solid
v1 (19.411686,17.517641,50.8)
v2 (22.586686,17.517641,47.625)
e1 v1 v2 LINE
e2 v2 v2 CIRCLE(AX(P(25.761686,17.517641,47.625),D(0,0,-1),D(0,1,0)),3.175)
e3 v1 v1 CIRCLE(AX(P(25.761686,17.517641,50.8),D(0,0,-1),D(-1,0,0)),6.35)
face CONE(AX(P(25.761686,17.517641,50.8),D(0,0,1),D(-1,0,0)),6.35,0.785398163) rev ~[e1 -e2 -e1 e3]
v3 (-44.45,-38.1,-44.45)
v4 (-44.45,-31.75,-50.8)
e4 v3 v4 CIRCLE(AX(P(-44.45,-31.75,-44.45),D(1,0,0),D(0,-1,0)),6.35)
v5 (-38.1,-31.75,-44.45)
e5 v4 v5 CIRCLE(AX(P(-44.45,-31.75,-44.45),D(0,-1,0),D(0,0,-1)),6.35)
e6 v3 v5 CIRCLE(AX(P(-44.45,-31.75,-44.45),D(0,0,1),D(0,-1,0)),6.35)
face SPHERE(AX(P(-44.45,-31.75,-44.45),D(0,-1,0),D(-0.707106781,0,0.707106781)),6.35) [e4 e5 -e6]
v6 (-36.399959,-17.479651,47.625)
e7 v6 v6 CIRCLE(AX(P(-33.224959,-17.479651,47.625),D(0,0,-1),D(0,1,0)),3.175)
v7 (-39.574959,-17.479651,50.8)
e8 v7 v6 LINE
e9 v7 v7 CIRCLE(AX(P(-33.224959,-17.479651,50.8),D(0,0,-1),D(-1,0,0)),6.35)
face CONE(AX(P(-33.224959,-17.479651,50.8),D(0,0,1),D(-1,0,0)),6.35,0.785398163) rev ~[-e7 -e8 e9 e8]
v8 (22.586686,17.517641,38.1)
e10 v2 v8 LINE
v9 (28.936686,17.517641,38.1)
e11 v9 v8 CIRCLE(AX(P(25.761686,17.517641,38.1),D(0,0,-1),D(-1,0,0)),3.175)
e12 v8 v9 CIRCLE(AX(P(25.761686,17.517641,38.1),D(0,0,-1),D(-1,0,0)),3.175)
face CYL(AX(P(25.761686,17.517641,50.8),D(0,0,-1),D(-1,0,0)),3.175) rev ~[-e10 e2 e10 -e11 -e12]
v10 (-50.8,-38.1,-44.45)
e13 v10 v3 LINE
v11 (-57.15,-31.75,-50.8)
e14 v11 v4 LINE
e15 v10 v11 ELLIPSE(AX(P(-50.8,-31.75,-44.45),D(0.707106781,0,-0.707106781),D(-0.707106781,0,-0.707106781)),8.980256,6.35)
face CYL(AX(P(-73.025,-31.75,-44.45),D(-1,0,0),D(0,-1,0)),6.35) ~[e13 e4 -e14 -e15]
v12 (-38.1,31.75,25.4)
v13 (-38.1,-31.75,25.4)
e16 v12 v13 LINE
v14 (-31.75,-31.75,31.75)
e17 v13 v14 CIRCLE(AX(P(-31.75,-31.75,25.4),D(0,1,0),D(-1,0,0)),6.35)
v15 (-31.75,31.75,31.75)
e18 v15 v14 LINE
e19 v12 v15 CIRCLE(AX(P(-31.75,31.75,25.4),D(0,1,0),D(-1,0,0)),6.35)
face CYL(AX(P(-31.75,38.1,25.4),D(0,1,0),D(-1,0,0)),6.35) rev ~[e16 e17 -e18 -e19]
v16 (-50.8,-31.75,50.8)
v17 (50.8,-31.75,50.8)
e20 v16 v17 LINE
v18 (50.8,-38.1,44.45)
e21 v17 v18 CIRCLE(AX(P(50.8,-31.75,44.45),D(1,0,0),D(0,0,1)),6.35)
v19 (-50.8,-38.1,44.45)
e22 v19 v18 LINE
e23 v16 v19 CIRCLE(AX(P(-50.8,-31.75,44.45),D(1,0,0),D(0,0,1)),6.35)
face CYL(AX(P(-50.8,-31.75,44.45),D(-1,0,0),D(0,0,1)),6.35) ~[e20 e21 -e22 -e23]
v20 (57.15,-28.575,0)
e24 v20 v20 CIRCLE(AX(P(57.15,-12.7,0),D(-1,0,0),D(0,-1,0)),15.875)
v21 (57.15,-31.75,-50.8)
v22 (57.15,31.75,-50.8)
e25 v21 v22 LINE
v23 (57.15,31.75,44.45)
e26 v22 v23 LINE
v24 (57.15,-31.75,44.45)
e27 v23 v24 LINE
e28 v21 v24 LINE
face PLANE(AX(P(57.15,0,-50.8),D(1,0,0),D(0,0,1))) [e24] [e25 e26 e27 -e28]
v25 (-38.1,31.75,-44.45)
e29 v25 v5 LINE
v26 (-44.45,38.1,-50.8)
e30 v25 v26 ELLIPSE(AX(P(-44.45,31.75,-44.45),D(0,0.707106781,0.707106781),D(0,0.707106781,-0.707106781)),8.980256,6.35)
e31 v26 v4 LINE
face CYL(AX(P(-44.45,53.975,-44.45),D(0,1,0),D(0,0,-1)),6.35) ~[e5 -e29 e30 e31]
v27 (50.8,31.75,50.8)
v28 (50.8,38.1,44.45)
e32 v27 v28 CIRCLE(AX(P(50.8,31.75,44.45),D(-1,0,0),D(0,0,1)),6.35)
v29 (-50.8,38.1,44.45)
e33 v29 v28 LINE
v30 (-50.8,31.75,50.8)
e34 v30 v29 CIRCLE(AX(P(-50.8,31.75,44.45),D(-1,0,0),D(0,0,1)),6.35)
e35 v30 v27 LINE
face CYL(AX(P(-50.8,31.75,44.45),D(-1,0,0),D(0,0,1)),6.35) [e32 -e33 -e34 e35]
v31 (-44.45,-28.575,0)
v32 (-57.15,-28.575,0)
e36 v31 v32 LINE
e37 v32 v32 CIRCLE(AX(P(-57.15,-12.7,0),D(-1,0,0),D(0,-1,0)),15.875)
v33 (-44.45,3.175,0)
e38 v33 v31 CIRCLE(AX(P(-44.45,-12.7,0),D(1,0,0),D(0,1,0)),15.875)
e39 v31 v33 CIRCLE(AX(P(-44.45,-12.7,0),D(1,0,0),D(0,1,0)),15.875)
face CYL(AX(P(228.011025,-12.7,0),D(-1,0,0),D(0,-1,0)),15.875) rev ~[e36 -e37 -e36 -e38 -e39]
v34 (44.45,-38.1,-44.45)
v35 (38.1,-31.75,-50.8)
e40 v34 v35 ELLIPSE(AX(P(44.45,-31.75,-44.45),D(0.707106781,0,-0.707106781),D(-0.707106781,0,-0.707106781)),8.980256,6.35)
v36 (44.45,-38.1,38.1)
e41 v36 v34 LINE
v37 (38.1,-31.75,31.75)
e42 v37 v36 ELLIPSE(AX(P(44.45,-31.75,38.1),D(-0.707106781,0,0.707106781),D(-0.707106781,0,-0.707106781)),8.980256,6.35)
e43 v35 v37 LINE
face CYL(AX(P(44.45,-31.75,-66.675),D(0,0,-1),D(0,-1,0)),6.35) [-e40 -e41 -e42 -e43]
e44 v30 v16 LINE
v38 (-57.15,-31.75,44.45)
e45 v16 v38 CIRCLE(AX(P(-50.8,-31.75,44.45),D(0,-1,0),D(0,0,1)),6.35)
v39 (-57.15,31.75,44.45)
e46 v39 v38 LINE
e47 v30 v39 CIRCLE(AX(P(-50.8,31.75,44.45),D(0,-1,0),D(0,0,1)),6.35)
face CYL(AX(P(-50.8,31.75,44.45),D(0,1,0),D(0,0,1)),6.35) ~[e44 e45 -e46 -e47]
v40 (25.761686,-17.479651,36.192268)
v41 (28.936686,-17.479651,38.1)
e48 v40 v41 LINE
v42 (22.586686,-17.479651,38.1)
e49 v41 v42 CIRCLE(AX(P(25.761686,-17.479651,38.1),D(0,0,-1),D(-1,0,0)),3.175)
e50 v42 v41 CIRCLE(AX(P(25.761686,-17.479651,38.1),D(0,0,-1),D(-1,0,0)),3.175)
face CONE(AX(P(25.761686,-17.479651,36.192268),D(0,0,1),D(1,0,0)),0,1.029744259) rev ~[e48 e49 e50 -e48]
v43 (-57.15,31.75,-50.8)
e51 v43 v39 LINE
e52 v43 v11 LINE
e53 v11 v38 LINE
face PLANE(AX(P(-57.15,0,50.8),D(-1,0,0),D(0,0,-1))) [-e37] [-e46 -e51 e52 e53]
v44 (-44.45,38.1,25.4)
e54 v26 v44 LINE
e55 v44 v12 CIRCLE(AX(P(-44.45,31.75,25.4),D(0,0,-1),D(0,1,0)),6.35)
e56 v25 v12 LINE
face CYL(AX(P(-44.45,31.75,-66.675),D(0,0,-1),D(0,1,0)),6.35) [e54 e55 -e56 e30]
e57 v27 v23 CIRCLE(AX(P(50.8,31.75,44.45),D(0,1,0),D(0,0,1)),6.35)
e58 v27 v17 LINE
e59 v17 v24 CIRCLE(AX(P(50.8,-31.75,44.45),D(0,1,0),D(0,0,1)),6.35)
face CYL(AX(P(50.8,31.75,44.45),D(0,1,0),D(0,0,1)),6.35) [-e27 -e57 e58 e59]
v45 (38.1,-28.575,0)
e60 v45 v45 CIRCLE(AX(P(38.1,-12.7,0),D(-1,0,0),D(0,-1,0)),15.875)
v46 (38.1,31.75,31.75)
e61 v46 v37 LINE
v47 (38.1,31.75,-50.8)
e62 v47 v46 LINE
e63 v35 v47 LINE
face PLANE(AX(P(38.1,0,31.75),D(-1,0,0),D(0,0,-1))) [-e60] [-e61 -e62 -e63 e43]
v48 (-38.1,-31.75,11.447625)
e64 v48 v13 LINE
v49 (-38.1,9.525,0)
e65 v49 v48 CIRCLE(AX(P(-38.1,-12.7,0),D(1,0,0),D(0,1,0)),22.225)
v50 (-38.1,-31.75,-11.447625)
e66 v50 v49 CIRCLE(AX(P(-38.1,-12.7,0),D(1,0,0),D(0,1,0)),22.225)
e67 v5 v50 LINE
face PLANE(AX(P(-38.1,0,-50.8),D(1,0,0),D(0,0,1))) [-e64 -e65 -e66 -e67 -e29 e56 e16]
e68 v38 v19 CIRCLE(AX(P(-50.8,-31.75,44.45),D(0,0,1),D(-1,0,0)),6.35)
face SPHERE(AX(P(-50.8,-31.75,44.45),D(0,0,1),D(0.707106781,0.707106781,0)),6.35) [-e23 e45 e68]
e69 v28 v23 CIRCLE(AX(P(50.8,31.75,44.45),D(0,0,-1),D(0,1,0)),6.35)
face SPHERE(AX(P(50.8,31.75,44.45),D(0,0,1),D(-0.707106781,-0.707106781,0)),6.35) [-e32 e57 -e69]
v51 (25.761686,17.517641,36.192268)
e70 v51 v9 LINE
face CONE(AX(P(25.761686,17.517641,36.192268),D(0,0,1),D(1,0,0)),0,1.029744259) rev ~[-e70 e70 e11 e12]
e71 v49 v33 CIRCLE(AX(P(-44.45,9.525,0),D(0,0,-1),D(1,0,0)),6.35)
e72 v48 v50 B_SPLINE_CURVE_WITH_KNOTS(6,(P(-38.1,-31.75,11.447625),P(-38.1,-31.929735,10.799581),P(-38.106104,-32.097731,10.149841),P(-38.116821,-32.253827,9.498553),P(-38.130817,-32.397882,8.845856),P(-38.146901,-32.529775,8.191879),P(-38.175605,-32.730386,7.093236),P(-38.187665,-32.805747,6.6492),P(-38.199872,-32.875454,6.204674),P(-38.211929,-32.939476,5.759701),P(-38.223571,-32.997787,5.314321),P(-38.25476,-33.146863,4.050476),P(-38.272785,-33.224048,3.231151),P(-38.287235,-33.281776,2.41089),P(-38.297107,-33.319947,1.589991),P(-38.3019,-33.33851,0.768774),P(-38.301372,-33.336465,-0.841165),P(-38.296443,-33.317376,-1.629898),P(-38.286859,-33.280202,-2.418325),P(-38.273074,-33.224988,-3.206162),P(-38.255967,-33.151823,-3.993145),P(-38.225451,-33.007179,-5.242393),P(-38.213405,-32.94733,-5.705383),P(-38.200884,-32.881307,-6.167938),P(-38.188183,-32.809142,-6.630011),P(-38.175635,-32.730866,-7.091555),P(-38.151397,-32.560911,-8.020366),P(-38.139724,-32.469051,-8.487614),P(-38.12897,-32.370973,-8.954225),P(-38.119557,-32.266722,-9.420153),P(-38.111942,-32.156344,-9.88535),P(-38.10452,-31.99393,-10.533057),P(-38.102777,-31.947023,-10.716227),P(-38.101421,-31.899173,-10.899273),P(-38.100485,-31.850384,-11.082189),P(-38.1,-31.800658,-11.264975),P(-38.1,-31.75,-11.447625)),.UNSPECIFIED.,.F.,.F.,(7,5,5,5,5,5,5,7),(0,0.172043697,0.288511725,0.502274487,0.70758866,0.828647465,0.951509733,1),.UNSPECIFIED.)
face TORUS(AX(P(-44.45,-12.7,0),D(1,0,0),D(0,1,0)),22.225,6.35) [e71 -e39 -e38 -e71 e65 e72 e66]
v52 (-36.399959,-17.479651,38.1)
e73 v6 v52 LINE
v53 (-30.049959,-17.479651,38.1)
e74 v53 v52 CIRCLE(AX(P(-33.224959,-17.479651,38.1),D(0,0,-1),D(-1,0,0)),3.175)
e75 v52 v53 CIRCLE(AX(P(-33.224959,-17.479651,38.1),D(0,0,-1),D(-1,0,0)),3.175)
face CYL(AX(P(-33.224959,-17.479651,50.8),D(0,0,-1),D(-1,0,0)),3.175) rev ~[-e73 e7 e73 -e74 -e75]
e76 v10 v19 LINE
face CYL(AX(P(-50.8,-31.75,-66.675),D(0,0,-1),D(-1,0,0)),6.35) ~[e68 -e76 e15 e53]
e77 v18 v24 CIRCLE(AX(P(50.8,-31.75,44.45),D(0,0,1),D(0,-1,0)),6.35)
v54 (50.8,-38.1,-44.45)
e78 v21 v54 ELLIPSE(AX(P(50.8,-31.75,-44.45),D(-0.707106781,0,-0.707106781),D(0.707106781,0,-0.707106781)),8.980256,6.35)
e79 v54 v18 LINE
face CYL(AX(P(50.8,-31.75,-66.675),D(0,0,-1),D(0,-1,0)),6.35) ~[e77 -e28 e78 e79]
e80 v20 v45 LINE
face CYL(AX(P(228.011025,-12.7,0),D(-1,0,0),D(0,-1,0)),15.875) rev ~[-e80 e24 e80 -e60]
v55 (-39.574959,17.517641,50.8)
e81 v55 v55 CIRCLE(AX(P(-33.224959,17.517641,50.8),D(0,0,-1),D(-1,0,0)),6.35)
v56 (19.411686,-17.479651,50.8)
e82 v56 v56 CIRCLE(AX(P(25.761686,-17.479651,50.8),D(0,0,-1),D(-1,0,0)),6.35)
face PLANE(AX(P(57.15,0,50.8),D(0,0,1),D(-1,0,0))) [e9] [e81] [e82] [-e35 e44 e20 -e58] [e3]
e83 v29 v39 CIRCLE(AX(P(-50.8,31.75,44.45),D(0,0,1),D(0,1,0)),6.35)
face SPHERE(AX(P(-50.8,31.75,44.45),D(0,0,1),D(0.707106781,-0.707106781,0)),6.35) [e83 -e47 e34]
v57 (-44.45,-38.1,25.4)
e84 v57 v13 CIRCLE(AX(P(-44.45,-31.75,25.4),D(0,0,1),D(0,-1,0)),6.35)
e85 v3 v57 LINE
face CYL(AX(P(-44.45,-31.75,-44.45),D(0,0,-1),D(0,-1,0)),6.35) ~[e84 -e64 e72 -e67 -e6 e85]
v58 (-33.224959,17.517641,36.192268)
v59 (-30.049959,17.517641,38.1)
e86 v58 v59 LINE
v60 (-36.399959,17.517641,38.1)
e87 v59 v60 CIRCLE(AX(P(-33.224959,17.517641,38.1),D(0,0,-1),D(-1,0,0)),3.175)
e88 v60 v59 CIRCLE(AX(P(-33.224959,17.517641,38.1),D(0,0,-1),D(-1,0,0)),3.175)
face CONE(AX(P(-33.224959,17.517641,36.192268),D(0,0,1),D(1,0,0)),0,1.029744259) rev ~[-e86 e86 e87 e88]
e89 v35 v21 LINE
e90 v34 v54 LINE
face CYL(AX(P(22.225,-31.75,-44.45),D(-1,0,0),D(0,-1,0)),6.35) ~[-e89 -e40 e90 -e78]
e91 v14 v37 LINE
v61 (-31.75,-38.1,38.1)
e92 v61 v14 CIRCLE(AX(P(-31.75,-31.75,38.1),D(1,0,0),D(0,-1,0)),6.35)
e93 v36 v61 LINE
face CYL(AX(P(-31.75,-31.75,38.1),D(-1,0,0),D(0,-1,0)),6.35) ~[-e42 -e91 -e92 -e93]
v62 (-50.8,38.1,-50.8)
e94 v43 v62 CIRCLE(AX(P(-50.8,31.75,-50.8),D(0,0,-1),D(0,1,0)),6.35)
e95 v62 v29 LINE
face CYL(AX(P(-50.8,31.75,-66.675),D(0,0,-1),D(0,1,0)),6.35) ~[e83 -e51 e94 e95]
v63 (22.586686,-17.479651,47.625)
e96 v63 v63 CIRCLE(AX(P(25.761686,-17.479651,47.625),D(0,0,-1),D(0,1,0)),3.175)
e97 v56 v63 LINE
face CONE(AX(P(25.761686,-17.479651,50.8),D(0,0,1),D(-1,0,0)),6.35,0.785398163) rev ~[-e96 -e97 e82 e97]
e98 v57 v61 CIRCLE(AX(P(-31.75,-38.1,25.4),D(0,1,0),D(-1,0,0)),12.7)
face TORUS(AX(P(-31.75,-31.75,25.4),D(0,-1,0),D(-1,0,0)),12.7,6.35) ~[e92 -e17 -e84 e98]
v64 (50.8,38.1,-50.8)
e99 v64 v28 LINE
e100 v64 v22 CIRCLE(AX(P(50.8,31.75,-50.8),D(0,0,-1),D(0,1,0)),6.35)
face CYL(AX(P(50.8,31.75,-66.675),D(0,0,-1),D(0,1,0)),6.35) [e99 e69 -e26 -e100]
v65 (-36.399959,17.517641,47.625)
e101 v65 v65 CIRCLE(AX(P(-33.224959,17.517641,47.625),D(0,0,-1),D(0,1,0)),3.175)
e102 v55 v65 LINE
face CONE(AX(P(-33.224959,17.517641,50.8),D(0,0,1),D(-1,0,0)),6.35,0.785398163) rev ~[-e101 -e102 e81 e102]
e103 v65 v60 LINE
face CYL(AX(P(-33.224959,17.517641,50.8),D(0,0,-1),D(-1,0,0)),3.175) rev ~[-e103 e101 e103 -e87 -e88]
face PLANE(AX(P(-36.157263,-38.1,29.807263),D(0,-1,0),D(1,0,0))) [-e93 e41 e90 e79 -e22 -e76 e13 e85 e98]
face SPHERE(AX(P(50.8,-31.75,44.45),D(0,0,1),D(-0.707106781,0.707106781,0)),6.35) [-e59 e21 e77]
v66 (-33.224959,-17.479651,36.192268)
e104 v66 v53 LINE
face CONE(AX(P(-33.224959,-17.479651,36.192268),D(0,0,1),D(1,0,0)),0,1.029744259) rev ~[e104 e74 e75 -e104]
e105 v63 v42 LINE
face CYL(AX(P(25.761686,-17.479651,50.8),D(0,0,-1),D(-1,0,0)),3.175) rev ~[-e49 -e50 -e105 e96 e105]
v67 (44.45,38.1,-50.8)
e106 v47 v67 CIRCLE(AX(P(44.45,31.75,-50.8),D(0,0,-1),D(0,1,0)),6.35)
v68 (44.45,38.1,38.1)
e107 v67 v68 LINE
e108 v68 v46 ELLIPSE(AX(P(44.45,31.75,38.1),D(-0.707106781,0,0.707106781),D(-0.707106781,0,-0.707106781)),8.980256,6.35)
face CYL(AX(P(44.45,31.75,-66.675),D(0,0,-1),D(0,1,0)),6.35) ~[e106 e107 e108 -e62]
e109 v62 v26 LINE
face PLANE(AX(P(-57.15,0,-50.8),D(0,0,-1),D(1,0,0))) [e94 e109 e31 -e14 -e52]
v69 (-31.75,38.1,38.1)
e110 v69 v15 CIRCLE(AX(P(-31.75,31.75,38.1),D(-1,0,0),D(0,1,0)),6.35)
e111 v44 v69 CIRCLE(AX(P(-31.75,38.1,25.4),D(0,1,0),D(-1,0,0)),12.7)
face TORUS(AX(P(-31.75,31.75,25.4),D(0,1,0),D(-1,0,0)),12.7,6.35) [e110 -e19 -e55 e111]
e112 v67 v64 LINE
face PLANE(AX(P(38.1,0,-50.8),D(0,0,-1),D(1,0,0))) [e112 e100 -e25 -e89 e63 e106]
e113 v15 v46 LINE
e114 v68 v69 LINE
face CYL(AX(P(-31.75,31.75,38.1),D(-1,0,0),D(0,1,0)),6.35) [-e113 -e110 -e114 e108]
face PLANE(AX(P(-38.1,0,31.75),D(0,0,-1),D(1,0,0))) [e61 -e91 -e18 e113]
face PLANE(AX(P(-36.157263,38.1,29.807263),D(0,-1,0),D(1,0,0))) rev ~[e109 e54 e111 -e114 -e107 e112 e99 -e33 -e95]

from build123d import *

# Parameters (mm, degrees)
F1_DEPTH       = 38.1
F3_D           = 31.75
F4_T1_DEPTH    = 76.2
F4_T3_DEPTH    = 101.6
F4_T5_DEPTH    = 111.125
F4_T7_DEPTH    = 28.575
F4_T9_DEPTH    = 69.85
F4_T11_DEPTH   = 69.85
F4_T13_DEPTH   = 98.425
F4_T15_DEPTH   = 50.8
F4_T17_DEPTH   = 63.5
F4_T19_DEPTH   = 85.725
F4_T21_DEPTH   = 92.075
F4_S25_W       = 6.477
F4_S25_H       = 6.477
F4_T26_DEPTH   = 6.477
F4_S31_W       = 6.477
F4_S31_H       = 6.477
F4_T32_DEPTH   = 6.477
F4_S37_W       = 6.477
F4_S37_H       = 6.477
F4_T38_DEPTH   = 6.477
F4_S43_W       = 6.477
F4_S43_H       = 6.477
F4_T44_DEPTH   = 6.477
F4_S49_W       = 6.477
F4_S49_H       = 6.477
F4_T50_DEPTH   = 6.477
F4_T56_ANGLE   = 90
F4_T58_ANGLE   = 90
F4_T63_DEPTH   = 85.725
F4_T67_DEPTH   = 98.425
F4_T74_DEPTH   = 85.725
F4_T78_DEPTH   = 98.425
F6_D           = 6.35
F6_DEPTH       = 12.7
F6_CSINK_D     = 12.7
F6_CSINK_ANGLE = 90
F6_TIP         = 1.9077324654


# Not quite as in the source:
# - a fillet or chamfer that OpenCascade refuses, or shapes differently, is made with other operations: its cross-section is extruded or revolved along the edge and cut away or added


with BuildPart() as f1:
    # F0 (on Front) → F1 (new body, symmetric)
    with BuildSketch(Plane.XZ):
        Polygon((57.15, 50.8), (-57.15, 50.8), (-57.15, -50.8), (-38.1, -50.8), (-38.1, 31.75), (38.1, 31.75), (38.1, -50.8), (57.15, -50.8), align=None)
    extrude(amount=F1_DEPTH, both=True)

    # F3 (through all)
    with Locations(Plane.YZ.offset(57.15)):
        with Locations((-12.7, 0)):
            Hole(F3_D / 2)

    # F4: fillet of radius 6.35 on 19 edges, made by hand

    # F4_s2 → F4_t1 (join)
    with BuildSketch(Plane.XZ.offset(-38.1)):
        with BuildLine():
            ThreePointArc((-38.1, 25.4), (-36.2401280605, 29.8901280605), (-31.75, 31.75))
            Line((-31.75, 31.75), (-38.1, 31.75))
            Line((-38.1, 31.75), (-38.1, 25.4))
        make_face()
    extrude(amount=F4_T1_DEPTH)

    # F4_s4 → F4_t3 (cut)
    with BuildSketch(Plane.YZ.offset(-50.8)):
        with BuildLine():
            ThreePointArc((-31.75, 50.8), (-36.2401280605, 48.9401280605), (-38.1, 44.45))
            Line((-38.1, 44.45), (-38.1, 50.8))
            Line((-38.1, 50.8), (-31.75, 50.8))
        make_face()
        with BuildLine():
            ThreePointArc((31.75, 50.8), (36.2401280605, 48.9401280605), (38.1, 44.45))
            Line((38.1, 44.45), (38.1, 50.8))
            Line((38.1, 50.8), (31.75, 50.8))
        make_face()
    extrude(amount=F4_T3_DEPTH, mode=Mode.SUBTRACT)

    # F4_s6 → F4_t5 (cut)
    with BuildSketch(Plane.XY.offset(-66.675)):
        with BuildLine():
            ThreePointArc((-57.15, -31.75), (-55.2901280605, -36.2401280605), (-50.8, -38.1))
            Line((-50.8, -38.1), (-57.15, -38.1))
            Line((-57.15, -38.1), (-57.15, -31.75))
        make_face()
        with BuildLine():
            ThreePointArc((50.8, -38.1), (55.2901280605, -36.2401280605), (57.15, -31.75))
            Line((57.15, -31.75), (57.15, -38.1))
            Line((57.15, -38.1), (50.8, -38.1))
        make_face()
        with BuildLine():
            ThreePointArc((50.8, 38.1), (55.2901280605, 36.2401280605), (57.15, 31.75))
            Line((57.15, 31.75), (57.15, 38.1))
            Line((57.15, 38.1), (50.8, 38.1))
        make_face()
        with BuildLine():
            ThreePointArc((-50.8, 38.1), (-55.2901280605, 36.2401280605), (-57.15, 31.75))
            Line((-57.15, 31.75), (-57.15, 38.1))
            Line((-57.15, 38.1), (-50.8, 38.1))
        make_face()
    extrude(amount=F4_T5_DEPTH, mode=Mode.SUBTRACT)

    # F4_s8 → F4_t7 (cut)
    with BuildSketch(Plane.YZ.offset(-73.025)):
        with BuildLine():
            ThreePointArc((-38.1, -44.45), (-36.2401280605, -48.9401280605), (-31.75, -50.8))
            Line((-31.75, -50.8), (-38.1, -50.8))
            Line((-38.1, -50.8), (-38.1, -44.45))
        make_face()
    extrude(amount=F4_T7_DEPTH, mode=Mode.SUBTRACT)

    # F4_s10 → F4_t9 (cut)
    with BuildSketch(Plane.XY.offset(-44.45)):
        with BuildLine():
            ThreePointArc((-44.45, -38.1), (-39.9598719395, -36.2401280605), (-38.1, -31.75))
            Line((-38.1, -31.75), (-38.1, -38.1))
            Line((-38.1, -38.1), (-44.45, -38.1))
        make_face()
    extrude(amount=F4_T9_DEPTH, mode=Mode.SUBTRACT)

    # F4_s12 → F4_t11 (cut)
    with BuildSketch(Plane.YZ.offset(-31.75)):
        with BuildLine():
            ThreePointArc((-38.1, 38.1), (-36.2401280605, 33.6098719395), (-31.75, 31.75))
            Line((-31.75, 31.75), (-38.1, 31.75))
            Line((-38.1, 31.75), (-38.1, 38.1))
        make_face()
        with BuildLine():
            ThreePointArc((38.1, 38.1), (36.2401280605, 33.6098719395), (31.75, 31.75))
            Line((31.75, 31.75), (38.1, 31.75))
            Line((38.1, 31.75), (38.1, 38.1))
        make_face()
    extrude(amount=F4_T11_DEPTH, mode=Mode.SUBTRACT)

    # F4_s14 → F4_t13 (cut)
    with BuildSketch(Plane.XY.offset(-66.675)):
        with BuildLine():
            ThreePointArc((44.45, -38.1), (39.9598719395, -36.2401280605), (38.1, -31.75))
            Line((38.1, -31.75), (38.1, -38.1))
            Line((38.1, -38.1), (44.45, -38.1))
        make_face()
        with BuildLine():
            ThreePointArc((44.45, 38.1), (39.9598719395, 36.2401280605), (38.1, 31.75))
            Line((38.1, 31.75), (38.1, 38.1))
            Line((38.1, 38.1), (44.45, 38.1))
        make_face()
    extrude(amount=F4_T13_DEPTH, mode=Mode.SUBTRACT)

    # F4_s16 → F4_t15 (cut)
    with BuildSketch(Plane.YZ.offset(22.225)):
        with BuildLine():
            ThreePointArc((-38.1, -44.45), (-36.2401280605, -48.9401280605), (-31.75, -50.8))
            Line((-31.75, -50.8), (-38.1, -50.8))
            Line((-38.1, -50.8), (-38.1, -44.45))
        make_face()
    extrude(amount=F4_T15_DEPTH, mode=Mode.SUBTRACT)

    # F4_s18 → F4_t17 (cut)
    with BuildSketch(Plane.XZ.offset(-31.75)):
        with BuildLine():
            ThreePointArc((-50.8, 50.8), (-55.2901280605, 48.9401280605), (-57.15, 44.45))
            Line((-57.15, 44.45), (-57.15, 50.8))
            Line((-57.15, 50.8), (-50.8, 50.8))
        make_face()
        with BuildLine():
            ThreePointArc((50.8, 50.8), (55.2901280605, 48.9401280605), (57.15, 44.45))
            Line((57.15, 44.45), (57.15, 50.8))
            Line((57.15, 50.8), (50.8, 50.8))
        make_face()
    extrude(amount=F4_T17_DEPTH, mode=Mode.SUBTRACT)

    # F4_s20 → F4_t19 (cut)
    with BuildSketch(Plane.XZ.offset(-53.975)):
        with BuildLine():
            ThreePointArc((-44.45, -50.8), (-39.9598719395, -48.9401280605), (-38.1, -44.45))
            Line((-38.1, -44.45), (-38.1, -50.8))
            Line((-38.1, -50.8), (-44.45, -50.8))
        make_face()
    extrude(amount=F4_T19_DEPTH, mode=Mode.SUBTRACT)

    # F4_s22 → F4_t21 (cut)
    with BuildSketch(Plane.XY.offset(-66.675)):
        with BuildLine():
            ThreePointArc((-44.45, 38.1), (-39.9598719395, 36.2401280605), (-38.1, 31.75))
            Line((-38.1, 31.75), (-38.1, 38.1))
            Line((-38.1, 38.1), (-44.45, 38.1))
        make_face()
    extrude(amount=F4_T21_DEPTH, mode=Mode.SUBTRACT)


with BuildPart() as f4_tool24:
    # F4_s25 → F4_t26 (new body)
    with BuildSketch(Plane.XY.offset(44.45)):
        with Locations((54.0385, -34.9885)):
            Rectangle(F4_S25_W, F4_S25_H)
    extrude(amount=F4_T26_DEPTH)

    # F4_s27 → F4_t28 (revolve, cut)
    with BuildSketch(Plane(origin=(50.8, -31.75, 44.45), x_dir=(-0.7071067812, 0.7071067812, 0), z_dir=(0.7071067812, 0.7071067812, 0))):
        with BuildLine():
            ThreePointArc((0, -6.35), (6.35, 0), (0, 6.35))
            Line((0, 6.35), (0, -6.35))
        make_face()
    revolve(axis=Axis((50.8, -31.75, 44.45), (0, 0, 1)), mode=Mode.SUBTRACT)


with BuildPart() as f1_1:
    add(f1.part)

    # F4_t23: cut F4_tool24
    add(f4_tool24.part, mode=Mode.SUBTRACT)


with BuildPart() as f4_tool30:
    # F4_s31 → F4_t32 (new body)
    with BuildSketch(Plane.XY.offset(44.45)):
        with Locations((-54.0385, -34.9885)):
            Rectangle(F4_S31_W, F4_S31_H)
    extrude(amount=F4_T32_DEPTH)

    # F4_s33 → F4_t34 (revolve, cut)
    with BuildSketch(Plane(origin=(-50.8, -31.75, 44.45), x_dir=(0.7071067812, 0.7071067812, 0), z_dir=(0.7071067812, -0.7071067812, 0))):
        with BuildLine():
            ThreePointArc((0, -6.35), (6.35, 0), (0, 6.35))
            Line((0, 6.35), (0, -6.35))
        make_face()
    revolve(axis=Axis((-50.8, -31.75, 44.45), (0, 0, 1)), mode=Mode.SUBTRACT)


with BuildPart() as f1_2:
    add(f1_1.part)

    # F4_t29: cut F4_tool30
    add(f4_tool30.part, mode=Mode.SUBTRACT)


with BuildPart() as f4_tool36:
    # F4_s37 → F4_t38 (new body)
    with BuildSketch(Plane.XZ.offset(31.75)):
        with Locations((-41.2115, -47.6885)):
            Rectangle(F4_S37_W, F4_S37_H)
    extrude(amount=F4_T38_DEPTH)

    # F4_s39 → F4_t40 (revolve, cut)
    with BuildSketch(Plane(origin=(-44.45, -31.75, -44.45), x_dir=(-0.7071067812, 0, 0.7071067812), z_dir=(0.7071067812, 0, 0.7071067812))):
        with BuildLine():
            ThreePointArc((0, -6.35), (6.35, 0), (0, 6.35))
            Line((0, 6.35), (0, -6.35))
        make_face()
    revolve(axis=Axis((-44.45, -31.75, -44.45), (0, -1, 0)), mode=Mode.SUBTRACT)


with BuildPart() as f1_3:
    add(f1_2.part)

    # F4_t35: cut F4_tool36
    add(f4_tool36.part, mode=Mode.SUBTRACT)


with BuildPart() as f4_tool42:
    # F4_s43 → F4_t44 (new body)
    with BuildSketch(Plane.XY.offset(44.45)):
        with Locations((-54.0385, 34.9885)):
            Rectangle(F4_S43_W, F4_S43_H)
    extrude(amount=F4_T44_DEPTH)

    # F4_s45 → F4_t46 (revolve, cut)
    with BuildSketch(Plane(origin=(-50.8, 31.75, 44.45), x_dir=(0.7071067812, -0.7071067812, 0), z_dir=(-0.7071067812, -0.7071067812, 0))):
        with BuildLine():
            ThreePointArc((0, -6.35), (6.35, 0), (0, 6.35))
            Line((0, 6.35), (0, -6.35))
        make_face()
    revolve(axis=Axis((-50.8, 31.75, 44.45), (0, 0, 1)), mode=Mode.SUBTRACT)


with BuildPart() as f1_4:
    add(f1_3.part)

    # F4_t41: cut F4_tool42
    add(f4_tool42.part, mode=Mode.SUBTRACT)


with BuildPart() as f4_tool48:
    # F4_s49 → F4_t50 (new body)
    with BuildSketch(Plane.XY.offset(44.45)):
        with Locations((54.0385, 34.9885)):
            Rectangle(F4_S49_W, F4_S49_H)
    extrude(amount=F4_T50_DEPTH)

    # F4_s51 → F4_t52 (revolve, cut)
    with BuildSketch(Plane(origin=(50.8, 31.75, 44.45), x_dir=(-0.7071067812, -0.7071067812, 0), z_dir=(-0.7071067812, 0.7071067812, 0))):
        with BuildLine():
            ThreePointArc((0, -6.35), (6.35, 0), (0, 6.35))
            Line((0, 6.35), (0, -6.35))
        make_face()
    revolve(axis=Axis((50.8, 31.75, 44.45), (0, 0, 1)), mode=Mode.SUBTRACT)


with BuildPart() as f1_5:
    add(f1_4.part)

    # F4_t47: cut F4_tool48
    add(f4_tool48.part, mode=Mode.SUBTRACT)

    # F4_s53 → F4_t54 (revolve, cut)
    with BuildSketch(Plane.XY):
        with BuildLine():
            ThreePointArc((-38.1, 9.525), (-39.9598719395, 5.0348719395), (-44.45, 3.175))
            Line((-44.45, 3.175), (-38.1, 3.175))
            Line((-38.1, 3.175), (-38.1, 9.525))
        make_face()
    revolve(axis=Axis((-38.1, -12.7, 0), (1, 0, 0)), mode=Mode.SUBTRACT)

    # F4_s55 → F4_t56 (revolve, cut)
    with BuildSketch(Plane.XY.offset(25.4)):
        with BuildLine():
            ThreePointArc((-44.45, 38.1), (-39.9598719395, 36.2401280605), (-38.1, 31.75))
            Line((-38.1, 31.75), (-38.1, 38.1))
            Line((-38.1, 38.1), (-44.45, 38.1))
        make_face()
    revolve(axis=Axis((-31.75, 38.1, 25.4), (0, 1, 0)), revolution_arc=F4_T56_ANGLE, mode=Mode.SUBTRACT)

    # F4_s57 → F4_t58 (revolve, cut)
    with BuildSketch(Plane.XY.offset(25.4)):
        with BuildLine():
            ThreePointArc((-44.45, -38.1), (-39.9598719395, -36.2401280605), (-38.1, -31.75))
            Line((-38.1, -31.75), (-38.1, -38.1))
            Line((-38.1, -38.1), (-44.45, -38.1))
        make_face()
    revolve(axis=Axis((-31.75, -38.1, 25.4), (0, 1, 0)), revolution_arc=F4_T58_ANGLE, mode=Mode.SUBTRACT)


with BuildPart() as f4_tool61:
    # F4_s62 → F4_t63 (new body)
    with BuildSketch(Plane.YZ.offset(-31.75)):
        with BuildLine():
            ThreePointArc((-38.1, 38.1), (-36.2401280605, 33.6098719395), (-31.75, 31.75))
            Line((-31.75, 31.75), (-38.1, 31.75))
            Line((-38.1, 31.75), (-38.1, 38.1))
        make_face()
    extrude(amount=F4_T63_DEPTH)

    split(bisect_by=Plane.YZ.offset(38.1), keep=Keep.TOP)


with BuildPart() as f4_tool65:
    # F4_s66 → F4_t67 (new body)
    with BuildSketch(Plane.XY.offset(47.625)):
        with BuildLine():
            ThreePointArc((44.45, -38.1), (39.9598719395, -36.2401280605), (38.1, -31.75))
            Line((38.1, -31.75), (38.1, -38.1))
            Line((38.1, -38.1), (44.45, -38.1))
        make_face()
    extrude(amount=-F4_T67_DEPTH)

    split(bisect_by=Plane.XY.offset(31.75), keep=Keep.TOP)


with BuildPart() as f4_tool61_1:
    add(f4_tool61.part)

    # F4_t69: intersect F4_tool65
    add(f4_tool65.part, mode=Mode.INTERSECT)


with BuildPart() as f1_6:
    add(f1_5.part)

    # F4_t59: cut F4_tool61
    add(f4_tool61_1.part, mode=Mode.SUBTRACT)


with BuildPart() as f4_tool72:
    # F4_s73 → F4_t74 (new body)
    with BuildSketch(Plane.YZ.offset(-31.75)):
        with BuildLine():
            ThreePointArc((38.1, 38.1), (36.2401280605, 33.6098719395), (31.75, 31.75))
            Line((31.75, 31.75), (38.1, 31.75))
            Line((38.1, 31.75), (38.1, 38.1))
        make_face()
    extrude(amount=F4_T74_DEPTH)

    split(bisect_by=Plane.YZ.offset(38.1), keep=Keep.TOP)


with BuildPart() as f4_tool76:
    # F4_s77 → F4_t78 (new body)
    with BuildSketch(Plane.XY.offset(47.625)):
        with BuildLine():
            ThreePointArc((44.45, 38.1), (39.9598719395, 36.2401280605), (38.1, 31.75))
            Line((38.1, 31.75), (38.1, 38.1))
            Line((38.1, 38.1), (44.45, 38.1))
        make_face()
    extrude(amount=-F4_T78_DEPTH)

    split(bisect_by=Plane.XY.offset(31.75), keep=Keep.TOP)


with BuildPart() as f4_tool72_1:
    add(f4_tool72.part)

    # F4_t80: intersect F4_tool76
    add(f4_tool76.part, mode=Mode.INTERSECT)


with BuildPart() as f1_7:
    add(f1_6.part)

    # F4_t70: cut F4_tool72
    add(f4_tool72_1.part, mode=Mode.SUBTRACT)

    # F6
    with Locations(Plane.XY.offset(50.8)):
        with Locations((-33.2249589264, 17.5176411867), (25.7616862655, 17.5176411867), (25.7616862655, -17.4796506763), (-33.2249589264, -17.4796506763)):
            CounterSinkHole(F6_D / 2, F6_CSINK_D / 2, depth=F6_DEPTH, counter_sink_angle=F6_CSINK_ANGLE)
            with Locations((0, 0, -(F6_DEPTH + F6_TIP / 2))):  # 118° drill point
                Cone(0, F6_D / 2, F6_TIP, mode=Mode.SUBTRACT)


solid = f1_7.part
